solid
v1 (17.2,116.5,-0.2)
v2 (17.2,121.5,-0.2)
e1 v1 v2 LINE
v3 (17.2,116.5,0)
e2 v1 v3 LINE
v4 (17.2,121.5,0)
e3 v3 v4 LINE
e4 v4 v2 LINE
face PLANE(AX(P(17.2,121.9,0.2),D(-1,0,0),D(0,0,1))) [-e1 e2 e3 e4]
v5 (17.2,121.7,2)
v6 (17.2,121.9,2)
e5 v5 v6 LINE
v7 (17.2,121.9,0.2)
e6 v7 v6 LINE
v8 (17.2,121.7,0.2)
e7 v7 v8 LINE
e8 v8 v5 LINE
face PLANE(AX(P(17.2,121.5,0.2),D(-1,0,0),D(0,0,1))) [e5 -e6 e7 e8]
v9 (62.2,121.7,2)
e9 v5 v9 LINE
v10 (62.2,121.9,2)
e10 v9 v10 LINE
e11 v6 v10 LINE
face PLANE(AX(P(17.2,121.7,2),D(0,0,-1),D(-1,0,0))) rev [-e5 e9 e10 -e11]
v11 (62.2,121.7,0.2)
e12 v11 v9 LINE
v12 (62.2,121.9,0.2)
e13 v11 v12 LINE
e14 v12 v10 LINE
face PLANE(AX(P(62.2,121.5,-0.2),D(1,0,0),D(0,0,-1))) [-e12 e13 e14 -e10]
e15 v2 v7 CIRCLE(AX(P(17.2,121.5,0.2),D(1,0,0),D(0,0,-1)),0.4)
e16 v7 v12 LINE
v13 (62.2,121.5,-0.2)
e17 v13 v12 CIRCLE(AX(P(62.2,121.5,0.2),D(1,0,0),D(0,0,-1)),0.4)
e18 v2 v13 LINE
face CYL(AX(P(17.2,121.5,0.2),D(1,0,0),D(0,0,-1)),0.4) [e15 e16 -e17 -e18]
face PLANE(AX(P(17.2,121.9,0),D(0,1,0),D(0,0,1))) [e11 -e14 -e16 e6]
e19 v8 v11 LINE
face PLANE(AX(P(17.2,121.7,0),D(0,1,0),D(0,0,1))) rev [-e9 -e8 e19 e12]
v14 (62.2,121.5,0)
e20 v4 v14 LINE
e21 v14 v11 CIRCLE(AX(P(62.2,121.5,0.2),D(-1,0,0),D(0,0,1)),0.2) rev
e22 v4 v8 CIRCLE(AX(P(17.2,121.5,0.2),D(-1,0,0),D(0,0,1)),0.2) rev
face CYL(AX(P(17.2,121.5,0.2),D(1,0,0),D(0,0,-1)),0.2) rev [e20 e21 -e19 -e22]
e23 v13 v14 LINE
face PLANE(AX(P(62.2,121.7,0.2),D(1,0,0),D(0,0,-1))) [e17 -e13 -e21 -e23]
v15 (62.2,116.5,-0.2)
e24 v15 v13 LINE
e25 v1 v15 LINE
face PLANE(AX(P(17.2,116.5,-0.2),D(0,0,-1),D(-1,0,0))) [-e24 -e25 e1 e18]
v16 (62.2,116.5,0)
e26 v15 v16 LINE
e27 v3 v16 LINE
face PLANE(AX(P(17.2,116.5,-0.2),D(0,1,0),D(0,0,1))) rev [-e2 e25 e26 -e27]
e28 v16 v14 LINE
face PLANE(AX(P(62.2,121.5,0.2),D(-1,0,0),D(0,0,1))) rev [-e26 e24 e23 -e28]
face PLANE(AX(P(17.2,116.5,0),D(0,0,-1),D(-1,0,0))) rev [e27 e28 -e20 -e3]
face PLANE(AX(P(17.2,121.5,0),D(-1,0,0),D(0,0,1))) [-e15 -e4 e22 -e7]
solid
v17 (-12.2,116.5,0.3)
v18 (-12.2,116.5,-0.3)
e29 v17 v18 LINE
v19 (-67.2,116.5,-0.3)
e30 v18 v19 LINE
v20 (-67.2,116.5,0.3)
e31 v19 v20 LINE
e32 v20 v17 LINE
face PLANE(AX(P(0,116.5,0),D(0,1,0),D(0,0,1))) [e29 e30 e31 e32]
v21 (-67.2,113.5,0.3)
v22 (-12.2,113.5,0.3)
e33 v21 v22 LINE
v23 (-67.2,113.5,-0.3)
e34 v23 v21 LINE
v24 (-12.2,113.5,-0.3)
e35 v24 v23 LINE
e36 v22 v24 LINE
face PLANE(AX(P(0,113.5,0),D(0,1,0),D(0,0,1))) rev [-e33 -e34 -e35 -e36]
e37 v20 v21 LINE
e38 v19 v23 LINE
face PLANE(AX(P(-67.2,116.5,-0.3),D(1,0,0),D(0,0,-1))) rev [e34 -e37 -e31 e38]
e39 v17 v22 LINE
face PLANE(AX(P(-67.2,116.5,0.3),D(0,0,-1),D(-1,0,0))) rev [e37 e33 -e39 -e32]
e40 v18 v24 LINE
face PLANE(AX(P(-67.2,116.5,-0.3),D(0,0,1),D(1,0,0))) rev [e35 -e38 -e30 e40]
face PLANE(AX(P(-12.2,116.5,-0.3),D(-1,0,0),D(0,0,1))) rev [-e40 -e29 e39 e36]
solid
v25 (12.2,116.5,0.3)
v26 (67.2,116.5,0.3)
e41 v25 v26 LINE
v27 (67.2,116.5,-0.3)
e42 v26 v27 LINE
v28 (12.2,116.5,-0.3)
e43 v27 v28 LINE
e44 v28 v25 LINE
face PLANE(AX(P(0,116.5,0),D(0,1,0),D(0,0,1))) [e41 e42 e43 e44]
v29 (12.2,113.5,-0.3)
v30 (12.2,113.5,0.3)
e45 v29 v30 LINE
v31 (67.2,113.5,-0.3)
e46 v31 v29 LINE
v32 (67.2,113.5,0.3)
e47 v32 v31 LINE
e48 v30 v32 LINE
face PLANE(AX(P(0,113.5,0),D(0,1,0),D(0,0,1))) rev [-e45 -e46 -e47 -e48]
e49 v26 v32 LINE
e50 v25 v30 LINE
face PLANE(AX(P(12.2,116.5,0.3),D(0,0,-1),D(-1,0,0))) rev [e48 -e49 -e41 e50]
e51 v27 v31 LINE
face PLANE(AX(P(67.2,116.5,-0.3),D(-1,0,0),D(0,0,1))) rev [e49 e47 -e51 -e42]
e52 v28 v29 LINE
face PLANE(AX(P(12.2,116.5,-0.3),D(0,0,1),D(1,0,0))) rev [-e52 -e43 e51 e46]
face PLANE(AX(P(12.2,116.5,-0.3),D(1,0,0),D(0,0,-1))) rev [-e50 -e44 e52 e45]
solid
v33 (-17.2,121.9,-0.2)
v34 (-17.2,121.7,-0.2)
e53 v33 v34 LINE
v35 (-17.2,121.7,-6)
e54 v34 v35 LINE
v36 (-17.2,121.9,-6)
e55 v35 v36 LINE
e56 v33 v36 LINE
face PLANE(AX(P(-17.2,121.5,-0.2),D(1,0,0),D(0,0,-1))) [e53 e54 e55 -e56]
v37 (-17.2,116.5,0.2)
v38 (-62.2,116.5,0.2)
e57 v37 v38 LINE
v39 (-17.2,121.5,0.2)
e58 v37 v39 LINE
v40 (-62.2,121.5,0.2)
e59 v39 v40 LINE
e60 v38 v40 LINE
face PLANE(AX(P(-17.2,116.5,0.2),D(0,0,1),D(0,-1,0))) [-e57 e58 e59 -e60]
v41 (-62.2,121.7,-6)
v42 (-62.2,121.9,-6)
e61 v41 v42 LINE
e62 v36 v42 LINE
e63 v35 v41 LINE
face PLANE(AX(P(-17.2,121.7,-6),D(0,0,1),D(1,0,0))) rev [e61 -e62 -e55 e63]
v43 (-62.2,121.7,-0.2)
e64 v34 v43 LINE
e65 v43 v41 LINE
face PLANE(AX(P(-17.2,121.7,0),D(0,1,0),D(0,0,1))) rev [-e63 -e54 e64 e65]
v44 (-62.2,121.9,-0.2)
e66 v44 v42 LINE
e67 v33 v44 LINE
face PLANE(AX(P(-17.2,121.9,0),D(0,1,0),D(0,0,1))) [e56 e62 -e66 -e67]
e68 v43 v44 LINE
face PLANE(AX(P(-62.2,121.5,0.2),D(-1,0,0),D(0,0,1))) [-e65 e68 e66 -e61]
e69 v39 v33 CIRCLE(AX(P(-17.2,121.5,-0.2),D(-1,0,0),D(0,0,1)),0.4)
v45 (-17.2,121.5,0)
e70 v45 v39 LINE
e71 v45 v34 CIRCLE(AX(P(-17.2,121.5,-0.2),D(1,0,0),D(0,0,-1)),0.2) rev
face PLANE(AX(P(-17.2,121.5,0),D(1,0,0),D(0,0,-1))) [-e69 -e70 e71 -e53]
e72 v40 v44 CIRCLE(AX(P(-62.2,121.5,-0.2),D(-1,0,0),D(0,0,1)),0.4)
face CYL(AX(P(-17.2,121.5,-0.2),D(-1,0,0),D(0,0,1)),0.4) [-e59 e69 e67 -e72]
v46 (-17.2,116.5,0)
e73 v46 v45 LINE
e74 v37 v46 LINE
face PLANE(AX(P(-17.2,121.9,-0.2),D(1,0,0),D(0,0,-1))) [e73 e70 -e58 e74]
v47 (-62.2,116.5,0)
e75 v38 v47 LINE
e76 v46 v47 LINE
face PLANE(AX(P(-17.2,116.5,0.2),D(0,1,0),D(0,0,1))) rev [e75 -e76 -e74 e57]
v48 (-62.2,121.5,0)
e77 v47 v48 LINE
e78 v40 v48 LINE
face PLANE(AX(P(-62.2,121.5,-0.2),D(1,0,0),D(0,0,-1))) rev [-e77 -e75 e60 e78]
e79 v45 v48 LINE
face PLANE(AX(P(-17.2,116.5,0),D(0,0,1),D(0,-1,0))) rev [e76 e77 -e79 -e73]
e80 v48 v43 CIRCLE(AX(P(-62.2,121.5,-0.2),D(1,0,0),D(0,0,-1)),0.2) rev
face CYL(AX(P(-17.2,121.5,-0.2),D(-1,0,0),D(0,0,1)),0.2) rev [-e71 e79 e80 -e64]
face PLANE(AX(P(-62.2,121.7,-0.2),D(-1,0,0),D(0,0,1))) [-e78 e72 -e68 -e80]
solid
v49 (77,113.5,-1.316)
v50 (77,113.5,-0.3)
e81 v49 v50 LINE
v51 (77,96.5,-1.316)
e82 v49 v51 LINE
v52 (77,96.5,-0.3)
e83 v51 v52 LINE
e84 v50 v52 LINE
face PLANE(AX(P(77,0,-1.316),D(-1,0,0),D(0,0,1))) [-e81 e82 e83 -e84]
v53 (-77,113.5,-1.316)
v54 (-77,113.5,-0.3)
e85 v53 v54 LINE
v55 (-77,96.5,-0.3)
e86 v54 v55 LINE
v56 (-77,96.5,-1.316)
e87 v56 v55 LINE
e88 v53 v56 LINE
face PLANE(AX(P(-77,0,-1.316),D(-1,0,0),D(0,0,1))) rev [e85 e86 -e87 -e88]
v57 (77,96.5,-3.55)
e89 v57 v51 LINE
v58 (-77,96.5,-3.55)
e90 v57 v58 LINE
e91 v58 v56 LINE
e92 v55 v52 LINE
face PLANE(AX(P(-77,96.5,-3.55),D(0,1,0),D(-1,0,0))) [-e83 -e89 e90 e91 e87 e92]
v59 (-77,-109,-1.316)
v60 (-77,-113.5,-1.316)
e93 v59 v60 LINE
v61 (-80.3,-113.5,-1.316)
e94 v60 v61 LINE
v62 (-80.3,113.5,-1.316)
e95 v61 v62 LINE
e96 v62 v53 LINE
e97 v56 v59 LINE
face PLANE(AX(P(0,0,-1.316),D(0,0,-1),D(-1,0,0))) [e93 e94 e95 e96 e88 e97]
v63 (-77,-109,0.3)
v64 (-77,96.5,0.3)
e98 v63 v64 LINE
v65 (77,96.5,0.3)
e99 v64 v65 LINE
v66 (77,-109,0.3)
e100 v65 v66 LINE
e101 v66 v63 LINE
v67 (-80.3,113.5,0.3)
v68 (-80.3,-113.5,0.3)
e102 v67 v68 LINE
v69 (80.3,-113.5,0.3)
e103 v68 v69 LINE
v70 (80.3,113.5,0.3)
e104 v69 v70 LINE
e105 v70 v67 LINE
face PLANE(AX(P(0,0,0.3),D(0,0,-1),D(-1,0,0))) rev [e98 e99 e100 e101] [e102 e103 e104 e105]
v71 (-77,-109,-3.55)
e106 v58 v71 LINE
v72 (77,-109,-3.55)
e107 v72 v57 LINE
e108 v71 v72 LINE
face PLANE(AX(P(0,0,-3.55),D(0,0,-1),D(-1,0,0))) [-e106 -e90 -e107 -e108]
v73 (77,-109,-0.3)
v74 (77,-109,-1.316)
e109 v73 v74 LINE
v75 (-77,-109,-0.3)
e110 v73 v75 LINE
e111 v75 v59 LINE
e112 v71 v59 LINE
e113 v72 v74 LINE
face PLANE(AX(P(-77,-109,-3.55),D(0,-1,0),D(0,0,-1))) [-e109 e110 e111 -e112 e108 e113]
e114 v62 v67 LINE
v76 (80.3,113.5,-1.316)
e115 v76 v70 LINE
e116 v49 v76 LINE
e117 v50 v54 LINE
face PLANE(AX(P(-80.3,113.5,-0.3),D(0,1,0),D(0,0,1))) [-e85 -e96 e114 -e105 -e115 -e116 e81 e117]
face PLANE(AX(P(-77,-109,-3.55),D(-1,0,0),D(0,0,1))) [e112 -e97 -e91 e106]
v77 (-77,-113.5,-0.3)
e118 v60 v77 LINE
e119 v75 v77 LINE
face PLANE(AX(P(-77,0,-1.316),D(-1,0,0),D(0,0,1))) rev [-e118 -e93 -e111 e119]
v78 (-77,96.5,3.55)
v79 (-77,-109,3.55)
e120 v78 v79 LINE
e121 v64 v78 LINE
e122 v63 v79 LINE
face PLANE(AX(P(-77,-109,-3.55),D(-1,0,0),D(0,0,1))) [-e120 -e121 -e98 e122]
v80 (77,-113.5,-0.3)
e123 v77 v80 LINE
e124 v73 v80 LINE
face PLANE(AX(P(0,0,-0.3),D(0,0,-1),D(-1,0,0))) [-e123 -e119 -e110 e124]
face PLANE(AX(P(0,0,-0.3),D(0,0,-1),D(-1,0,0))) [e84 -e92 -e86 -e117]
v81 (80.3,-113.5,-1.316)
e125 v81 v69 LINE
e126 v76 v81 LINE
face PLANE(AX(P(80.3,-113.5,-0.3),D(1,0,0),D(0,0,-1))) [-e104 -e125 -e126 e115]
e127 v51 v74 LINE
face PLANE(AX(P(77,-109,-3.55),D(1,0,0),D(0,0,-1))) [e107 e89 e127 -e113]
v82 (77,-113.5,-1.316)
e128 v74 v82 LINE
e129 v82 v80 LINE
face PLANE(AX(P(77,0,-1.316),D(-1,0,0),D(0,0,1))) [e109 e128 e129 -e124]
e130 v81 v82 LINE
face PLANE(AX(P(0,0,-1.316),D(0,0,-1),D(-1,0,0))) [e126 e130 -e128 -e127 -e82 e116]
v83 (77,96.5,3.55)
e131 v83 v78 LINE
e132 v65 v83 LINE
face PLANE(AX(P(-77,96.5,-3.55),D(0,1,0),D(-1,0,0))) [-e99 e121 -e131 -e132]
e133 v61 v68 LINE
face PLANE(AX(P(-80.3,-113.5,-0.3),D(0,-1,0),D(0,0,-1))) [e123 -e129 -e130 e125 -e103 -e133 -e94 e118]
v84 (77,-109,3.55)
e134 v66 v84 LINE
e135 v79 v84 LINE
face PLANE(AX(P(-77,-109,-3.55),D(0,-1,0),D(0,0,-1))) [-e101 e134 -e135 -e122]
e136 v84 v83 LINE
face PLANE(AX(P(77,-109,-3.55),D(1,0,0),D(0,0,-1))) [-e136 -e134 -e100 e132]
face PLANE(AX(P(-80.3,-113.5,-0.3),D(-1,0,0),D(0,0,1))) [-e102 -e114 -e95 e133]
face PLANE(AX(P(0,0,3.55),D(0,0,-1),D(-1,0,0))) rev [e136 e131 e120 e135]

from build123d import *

# Parameters (mm, degrees)
INSULATION_DEPTH      = 0.3
INSULATION_DEPTH_BACK = 0.3
SKETCH1_W             = 160.6
SKETCH1_H             = 227
MAIN_BODY_DEPTH       = 3.55
MAIN_BODY_DEPTH_BACK  = 3.55
SKETCH2_W             = 154
SKETCH2_H             = 205.5
SIDE_FOLDS_DEPTH      = 1.016
SKETCH114_W           = 55
SKETCH114_H           = 0.6
BOSS_EXTRUDE1_DEPTH   = 3
BOSS_EXTRUDE1_2_DEPTH = 3
BASE_FLANGE1_DEPTH    = 45
BASE_FLANGE2_DEPTH    = 45


# Sheet-metal steps are written as plain solids
with BuildPart() as part:
    # Sketch1 → Insulation (new, two sides: drawn at the far end of the back side and taken through both)
    with BuildSketch(Plane.XY.offset(-INSULATION_DEPTH_BACK)):
        Rectangle(SKETCH1_W, SKETCH1_H)
    extrude(amount=INSULATION_DEPTH + INSULATION_DEPTH_BACK)

    # Sketch2 → Main Body (add, two sides: drawn at the far end of the back side and taken through both)
    with BuildSketch(Plane.XY.offset(-MAIN_BODY_DEPTH_BACK)):
        with Locations((0, -6.25)):
            Rectangle(SKETCH2_W, SKETCH2_H)
    extrude(amount=MAIN_BODY_DEPTH + MAIN_BODY_DEPTH_BACK)

    # Sketch5 → Side Folds (add)
    with BuildSketch(Plane(origin=(0, 0, -0.3), x_dir=(-1, 0, 0), z_dir=(0, 0, -1))):
        Polygon((-77, -109), (-77, 96.5), (-77, 113.5), (-80.3, 113.5), (-80.3, -113.5), (-77, -113.5), align=None)
        Polygon((77, 113.5), (77, 96.5), (77, -109), (77, -113.5), (80.3, -113.5), (80.3, 113.5), align=None)
    extrude(amount=SIDE_FOLDS_DEPTH)


with BuildPart() as body_2:
    # Sketch114 → Boss-Extrude1 (new body)
    with BuildSketch(Plane(origin=(0, 113.5, 0), x_dir=(1, 0, 0), z_dir=(0, 1, 0))):
        with Locations((-39.7, 0)):
            Rectangle(SKETCH114_W, SKETCH114_H)
    extrude(amount=BOSS_EXTRUDE1_DEPTH)


with BuildPart() as body_3:
    # Sketch114 → Boss-Extrude1 2 (new body)
    with BuildSketch(Plane(origin=(0, 113.5, 0), x_dir=(1, 0, 0), z_dir=(0, 1, 0))):
        with Locations((39.7, 0)):
            Rectangle(SKETCH114_W, SKETCH114_H)
    extrude(amount=BOSS_EXTRUDE1_2_DEPTH)


with BuildPart() as body_4:
    # Sketch115 → Base-Flange1 (new body)
    with BuildSketch(Plane.ZY.offset(62.2)):
        with BuildLine():
            Line((0, 116.5), (0, 121.5))
            ThreePointArc((0, 121.5), (-0.058578644, 121.641421356), (-0.2, 121.7))
            Line((-0.2, 121.7), (-6, 121.7))
            Line((-6, 121.7), (-6, 121.9))
            Line((-6, 121.9), (-0.2, 121.9))
            ThreePointArc((-0.2, 121.9), (0.082842712, 121.782842712), (0.2, 121.5))
            Line((0.2, 121.5), (0.2, 116.5))
            Line((0.2, 116.5), (0, 116.5))
        make_face()
    extrude(amount=-BASE_FLANGE1_DEPTH)


with BuildPart() as body_5:
    # Sketch120 → Base-Flange2 (new body)
    with BuildSketch(Plane(origin=(62.2, 0, 0), x_dir=(0, 0, -1), z_dir=(1, 0, 0))):
        with BuildLine():
            Line((0, 116.5), (0, 121.5))
            ThreePointArc((0, 121.5), (-0.058578644, 121.641421356), (-0.2, 121.7))
            Line((-0.2, 121.7), (-2, 121.7))
            Line((-2, 121.7), (-2, 121.9))
            Line((-2, 121.9), (-0.2, 121.9))
            ThreePointArc((-0.2, 121.9), (0.082842712, 121.782842712), (0.2, 121.5))
            Line((0.2, 121.5), (0.2, 116.5))
            Line((0.2, 116.5), (0, 116.5))
        make_face()
    extrude(amount=-BASE_FLANGE2_DEPTH)


solid = Compound([part.part, body_2.part, body_3.part, body_4.part, body_5.part])
